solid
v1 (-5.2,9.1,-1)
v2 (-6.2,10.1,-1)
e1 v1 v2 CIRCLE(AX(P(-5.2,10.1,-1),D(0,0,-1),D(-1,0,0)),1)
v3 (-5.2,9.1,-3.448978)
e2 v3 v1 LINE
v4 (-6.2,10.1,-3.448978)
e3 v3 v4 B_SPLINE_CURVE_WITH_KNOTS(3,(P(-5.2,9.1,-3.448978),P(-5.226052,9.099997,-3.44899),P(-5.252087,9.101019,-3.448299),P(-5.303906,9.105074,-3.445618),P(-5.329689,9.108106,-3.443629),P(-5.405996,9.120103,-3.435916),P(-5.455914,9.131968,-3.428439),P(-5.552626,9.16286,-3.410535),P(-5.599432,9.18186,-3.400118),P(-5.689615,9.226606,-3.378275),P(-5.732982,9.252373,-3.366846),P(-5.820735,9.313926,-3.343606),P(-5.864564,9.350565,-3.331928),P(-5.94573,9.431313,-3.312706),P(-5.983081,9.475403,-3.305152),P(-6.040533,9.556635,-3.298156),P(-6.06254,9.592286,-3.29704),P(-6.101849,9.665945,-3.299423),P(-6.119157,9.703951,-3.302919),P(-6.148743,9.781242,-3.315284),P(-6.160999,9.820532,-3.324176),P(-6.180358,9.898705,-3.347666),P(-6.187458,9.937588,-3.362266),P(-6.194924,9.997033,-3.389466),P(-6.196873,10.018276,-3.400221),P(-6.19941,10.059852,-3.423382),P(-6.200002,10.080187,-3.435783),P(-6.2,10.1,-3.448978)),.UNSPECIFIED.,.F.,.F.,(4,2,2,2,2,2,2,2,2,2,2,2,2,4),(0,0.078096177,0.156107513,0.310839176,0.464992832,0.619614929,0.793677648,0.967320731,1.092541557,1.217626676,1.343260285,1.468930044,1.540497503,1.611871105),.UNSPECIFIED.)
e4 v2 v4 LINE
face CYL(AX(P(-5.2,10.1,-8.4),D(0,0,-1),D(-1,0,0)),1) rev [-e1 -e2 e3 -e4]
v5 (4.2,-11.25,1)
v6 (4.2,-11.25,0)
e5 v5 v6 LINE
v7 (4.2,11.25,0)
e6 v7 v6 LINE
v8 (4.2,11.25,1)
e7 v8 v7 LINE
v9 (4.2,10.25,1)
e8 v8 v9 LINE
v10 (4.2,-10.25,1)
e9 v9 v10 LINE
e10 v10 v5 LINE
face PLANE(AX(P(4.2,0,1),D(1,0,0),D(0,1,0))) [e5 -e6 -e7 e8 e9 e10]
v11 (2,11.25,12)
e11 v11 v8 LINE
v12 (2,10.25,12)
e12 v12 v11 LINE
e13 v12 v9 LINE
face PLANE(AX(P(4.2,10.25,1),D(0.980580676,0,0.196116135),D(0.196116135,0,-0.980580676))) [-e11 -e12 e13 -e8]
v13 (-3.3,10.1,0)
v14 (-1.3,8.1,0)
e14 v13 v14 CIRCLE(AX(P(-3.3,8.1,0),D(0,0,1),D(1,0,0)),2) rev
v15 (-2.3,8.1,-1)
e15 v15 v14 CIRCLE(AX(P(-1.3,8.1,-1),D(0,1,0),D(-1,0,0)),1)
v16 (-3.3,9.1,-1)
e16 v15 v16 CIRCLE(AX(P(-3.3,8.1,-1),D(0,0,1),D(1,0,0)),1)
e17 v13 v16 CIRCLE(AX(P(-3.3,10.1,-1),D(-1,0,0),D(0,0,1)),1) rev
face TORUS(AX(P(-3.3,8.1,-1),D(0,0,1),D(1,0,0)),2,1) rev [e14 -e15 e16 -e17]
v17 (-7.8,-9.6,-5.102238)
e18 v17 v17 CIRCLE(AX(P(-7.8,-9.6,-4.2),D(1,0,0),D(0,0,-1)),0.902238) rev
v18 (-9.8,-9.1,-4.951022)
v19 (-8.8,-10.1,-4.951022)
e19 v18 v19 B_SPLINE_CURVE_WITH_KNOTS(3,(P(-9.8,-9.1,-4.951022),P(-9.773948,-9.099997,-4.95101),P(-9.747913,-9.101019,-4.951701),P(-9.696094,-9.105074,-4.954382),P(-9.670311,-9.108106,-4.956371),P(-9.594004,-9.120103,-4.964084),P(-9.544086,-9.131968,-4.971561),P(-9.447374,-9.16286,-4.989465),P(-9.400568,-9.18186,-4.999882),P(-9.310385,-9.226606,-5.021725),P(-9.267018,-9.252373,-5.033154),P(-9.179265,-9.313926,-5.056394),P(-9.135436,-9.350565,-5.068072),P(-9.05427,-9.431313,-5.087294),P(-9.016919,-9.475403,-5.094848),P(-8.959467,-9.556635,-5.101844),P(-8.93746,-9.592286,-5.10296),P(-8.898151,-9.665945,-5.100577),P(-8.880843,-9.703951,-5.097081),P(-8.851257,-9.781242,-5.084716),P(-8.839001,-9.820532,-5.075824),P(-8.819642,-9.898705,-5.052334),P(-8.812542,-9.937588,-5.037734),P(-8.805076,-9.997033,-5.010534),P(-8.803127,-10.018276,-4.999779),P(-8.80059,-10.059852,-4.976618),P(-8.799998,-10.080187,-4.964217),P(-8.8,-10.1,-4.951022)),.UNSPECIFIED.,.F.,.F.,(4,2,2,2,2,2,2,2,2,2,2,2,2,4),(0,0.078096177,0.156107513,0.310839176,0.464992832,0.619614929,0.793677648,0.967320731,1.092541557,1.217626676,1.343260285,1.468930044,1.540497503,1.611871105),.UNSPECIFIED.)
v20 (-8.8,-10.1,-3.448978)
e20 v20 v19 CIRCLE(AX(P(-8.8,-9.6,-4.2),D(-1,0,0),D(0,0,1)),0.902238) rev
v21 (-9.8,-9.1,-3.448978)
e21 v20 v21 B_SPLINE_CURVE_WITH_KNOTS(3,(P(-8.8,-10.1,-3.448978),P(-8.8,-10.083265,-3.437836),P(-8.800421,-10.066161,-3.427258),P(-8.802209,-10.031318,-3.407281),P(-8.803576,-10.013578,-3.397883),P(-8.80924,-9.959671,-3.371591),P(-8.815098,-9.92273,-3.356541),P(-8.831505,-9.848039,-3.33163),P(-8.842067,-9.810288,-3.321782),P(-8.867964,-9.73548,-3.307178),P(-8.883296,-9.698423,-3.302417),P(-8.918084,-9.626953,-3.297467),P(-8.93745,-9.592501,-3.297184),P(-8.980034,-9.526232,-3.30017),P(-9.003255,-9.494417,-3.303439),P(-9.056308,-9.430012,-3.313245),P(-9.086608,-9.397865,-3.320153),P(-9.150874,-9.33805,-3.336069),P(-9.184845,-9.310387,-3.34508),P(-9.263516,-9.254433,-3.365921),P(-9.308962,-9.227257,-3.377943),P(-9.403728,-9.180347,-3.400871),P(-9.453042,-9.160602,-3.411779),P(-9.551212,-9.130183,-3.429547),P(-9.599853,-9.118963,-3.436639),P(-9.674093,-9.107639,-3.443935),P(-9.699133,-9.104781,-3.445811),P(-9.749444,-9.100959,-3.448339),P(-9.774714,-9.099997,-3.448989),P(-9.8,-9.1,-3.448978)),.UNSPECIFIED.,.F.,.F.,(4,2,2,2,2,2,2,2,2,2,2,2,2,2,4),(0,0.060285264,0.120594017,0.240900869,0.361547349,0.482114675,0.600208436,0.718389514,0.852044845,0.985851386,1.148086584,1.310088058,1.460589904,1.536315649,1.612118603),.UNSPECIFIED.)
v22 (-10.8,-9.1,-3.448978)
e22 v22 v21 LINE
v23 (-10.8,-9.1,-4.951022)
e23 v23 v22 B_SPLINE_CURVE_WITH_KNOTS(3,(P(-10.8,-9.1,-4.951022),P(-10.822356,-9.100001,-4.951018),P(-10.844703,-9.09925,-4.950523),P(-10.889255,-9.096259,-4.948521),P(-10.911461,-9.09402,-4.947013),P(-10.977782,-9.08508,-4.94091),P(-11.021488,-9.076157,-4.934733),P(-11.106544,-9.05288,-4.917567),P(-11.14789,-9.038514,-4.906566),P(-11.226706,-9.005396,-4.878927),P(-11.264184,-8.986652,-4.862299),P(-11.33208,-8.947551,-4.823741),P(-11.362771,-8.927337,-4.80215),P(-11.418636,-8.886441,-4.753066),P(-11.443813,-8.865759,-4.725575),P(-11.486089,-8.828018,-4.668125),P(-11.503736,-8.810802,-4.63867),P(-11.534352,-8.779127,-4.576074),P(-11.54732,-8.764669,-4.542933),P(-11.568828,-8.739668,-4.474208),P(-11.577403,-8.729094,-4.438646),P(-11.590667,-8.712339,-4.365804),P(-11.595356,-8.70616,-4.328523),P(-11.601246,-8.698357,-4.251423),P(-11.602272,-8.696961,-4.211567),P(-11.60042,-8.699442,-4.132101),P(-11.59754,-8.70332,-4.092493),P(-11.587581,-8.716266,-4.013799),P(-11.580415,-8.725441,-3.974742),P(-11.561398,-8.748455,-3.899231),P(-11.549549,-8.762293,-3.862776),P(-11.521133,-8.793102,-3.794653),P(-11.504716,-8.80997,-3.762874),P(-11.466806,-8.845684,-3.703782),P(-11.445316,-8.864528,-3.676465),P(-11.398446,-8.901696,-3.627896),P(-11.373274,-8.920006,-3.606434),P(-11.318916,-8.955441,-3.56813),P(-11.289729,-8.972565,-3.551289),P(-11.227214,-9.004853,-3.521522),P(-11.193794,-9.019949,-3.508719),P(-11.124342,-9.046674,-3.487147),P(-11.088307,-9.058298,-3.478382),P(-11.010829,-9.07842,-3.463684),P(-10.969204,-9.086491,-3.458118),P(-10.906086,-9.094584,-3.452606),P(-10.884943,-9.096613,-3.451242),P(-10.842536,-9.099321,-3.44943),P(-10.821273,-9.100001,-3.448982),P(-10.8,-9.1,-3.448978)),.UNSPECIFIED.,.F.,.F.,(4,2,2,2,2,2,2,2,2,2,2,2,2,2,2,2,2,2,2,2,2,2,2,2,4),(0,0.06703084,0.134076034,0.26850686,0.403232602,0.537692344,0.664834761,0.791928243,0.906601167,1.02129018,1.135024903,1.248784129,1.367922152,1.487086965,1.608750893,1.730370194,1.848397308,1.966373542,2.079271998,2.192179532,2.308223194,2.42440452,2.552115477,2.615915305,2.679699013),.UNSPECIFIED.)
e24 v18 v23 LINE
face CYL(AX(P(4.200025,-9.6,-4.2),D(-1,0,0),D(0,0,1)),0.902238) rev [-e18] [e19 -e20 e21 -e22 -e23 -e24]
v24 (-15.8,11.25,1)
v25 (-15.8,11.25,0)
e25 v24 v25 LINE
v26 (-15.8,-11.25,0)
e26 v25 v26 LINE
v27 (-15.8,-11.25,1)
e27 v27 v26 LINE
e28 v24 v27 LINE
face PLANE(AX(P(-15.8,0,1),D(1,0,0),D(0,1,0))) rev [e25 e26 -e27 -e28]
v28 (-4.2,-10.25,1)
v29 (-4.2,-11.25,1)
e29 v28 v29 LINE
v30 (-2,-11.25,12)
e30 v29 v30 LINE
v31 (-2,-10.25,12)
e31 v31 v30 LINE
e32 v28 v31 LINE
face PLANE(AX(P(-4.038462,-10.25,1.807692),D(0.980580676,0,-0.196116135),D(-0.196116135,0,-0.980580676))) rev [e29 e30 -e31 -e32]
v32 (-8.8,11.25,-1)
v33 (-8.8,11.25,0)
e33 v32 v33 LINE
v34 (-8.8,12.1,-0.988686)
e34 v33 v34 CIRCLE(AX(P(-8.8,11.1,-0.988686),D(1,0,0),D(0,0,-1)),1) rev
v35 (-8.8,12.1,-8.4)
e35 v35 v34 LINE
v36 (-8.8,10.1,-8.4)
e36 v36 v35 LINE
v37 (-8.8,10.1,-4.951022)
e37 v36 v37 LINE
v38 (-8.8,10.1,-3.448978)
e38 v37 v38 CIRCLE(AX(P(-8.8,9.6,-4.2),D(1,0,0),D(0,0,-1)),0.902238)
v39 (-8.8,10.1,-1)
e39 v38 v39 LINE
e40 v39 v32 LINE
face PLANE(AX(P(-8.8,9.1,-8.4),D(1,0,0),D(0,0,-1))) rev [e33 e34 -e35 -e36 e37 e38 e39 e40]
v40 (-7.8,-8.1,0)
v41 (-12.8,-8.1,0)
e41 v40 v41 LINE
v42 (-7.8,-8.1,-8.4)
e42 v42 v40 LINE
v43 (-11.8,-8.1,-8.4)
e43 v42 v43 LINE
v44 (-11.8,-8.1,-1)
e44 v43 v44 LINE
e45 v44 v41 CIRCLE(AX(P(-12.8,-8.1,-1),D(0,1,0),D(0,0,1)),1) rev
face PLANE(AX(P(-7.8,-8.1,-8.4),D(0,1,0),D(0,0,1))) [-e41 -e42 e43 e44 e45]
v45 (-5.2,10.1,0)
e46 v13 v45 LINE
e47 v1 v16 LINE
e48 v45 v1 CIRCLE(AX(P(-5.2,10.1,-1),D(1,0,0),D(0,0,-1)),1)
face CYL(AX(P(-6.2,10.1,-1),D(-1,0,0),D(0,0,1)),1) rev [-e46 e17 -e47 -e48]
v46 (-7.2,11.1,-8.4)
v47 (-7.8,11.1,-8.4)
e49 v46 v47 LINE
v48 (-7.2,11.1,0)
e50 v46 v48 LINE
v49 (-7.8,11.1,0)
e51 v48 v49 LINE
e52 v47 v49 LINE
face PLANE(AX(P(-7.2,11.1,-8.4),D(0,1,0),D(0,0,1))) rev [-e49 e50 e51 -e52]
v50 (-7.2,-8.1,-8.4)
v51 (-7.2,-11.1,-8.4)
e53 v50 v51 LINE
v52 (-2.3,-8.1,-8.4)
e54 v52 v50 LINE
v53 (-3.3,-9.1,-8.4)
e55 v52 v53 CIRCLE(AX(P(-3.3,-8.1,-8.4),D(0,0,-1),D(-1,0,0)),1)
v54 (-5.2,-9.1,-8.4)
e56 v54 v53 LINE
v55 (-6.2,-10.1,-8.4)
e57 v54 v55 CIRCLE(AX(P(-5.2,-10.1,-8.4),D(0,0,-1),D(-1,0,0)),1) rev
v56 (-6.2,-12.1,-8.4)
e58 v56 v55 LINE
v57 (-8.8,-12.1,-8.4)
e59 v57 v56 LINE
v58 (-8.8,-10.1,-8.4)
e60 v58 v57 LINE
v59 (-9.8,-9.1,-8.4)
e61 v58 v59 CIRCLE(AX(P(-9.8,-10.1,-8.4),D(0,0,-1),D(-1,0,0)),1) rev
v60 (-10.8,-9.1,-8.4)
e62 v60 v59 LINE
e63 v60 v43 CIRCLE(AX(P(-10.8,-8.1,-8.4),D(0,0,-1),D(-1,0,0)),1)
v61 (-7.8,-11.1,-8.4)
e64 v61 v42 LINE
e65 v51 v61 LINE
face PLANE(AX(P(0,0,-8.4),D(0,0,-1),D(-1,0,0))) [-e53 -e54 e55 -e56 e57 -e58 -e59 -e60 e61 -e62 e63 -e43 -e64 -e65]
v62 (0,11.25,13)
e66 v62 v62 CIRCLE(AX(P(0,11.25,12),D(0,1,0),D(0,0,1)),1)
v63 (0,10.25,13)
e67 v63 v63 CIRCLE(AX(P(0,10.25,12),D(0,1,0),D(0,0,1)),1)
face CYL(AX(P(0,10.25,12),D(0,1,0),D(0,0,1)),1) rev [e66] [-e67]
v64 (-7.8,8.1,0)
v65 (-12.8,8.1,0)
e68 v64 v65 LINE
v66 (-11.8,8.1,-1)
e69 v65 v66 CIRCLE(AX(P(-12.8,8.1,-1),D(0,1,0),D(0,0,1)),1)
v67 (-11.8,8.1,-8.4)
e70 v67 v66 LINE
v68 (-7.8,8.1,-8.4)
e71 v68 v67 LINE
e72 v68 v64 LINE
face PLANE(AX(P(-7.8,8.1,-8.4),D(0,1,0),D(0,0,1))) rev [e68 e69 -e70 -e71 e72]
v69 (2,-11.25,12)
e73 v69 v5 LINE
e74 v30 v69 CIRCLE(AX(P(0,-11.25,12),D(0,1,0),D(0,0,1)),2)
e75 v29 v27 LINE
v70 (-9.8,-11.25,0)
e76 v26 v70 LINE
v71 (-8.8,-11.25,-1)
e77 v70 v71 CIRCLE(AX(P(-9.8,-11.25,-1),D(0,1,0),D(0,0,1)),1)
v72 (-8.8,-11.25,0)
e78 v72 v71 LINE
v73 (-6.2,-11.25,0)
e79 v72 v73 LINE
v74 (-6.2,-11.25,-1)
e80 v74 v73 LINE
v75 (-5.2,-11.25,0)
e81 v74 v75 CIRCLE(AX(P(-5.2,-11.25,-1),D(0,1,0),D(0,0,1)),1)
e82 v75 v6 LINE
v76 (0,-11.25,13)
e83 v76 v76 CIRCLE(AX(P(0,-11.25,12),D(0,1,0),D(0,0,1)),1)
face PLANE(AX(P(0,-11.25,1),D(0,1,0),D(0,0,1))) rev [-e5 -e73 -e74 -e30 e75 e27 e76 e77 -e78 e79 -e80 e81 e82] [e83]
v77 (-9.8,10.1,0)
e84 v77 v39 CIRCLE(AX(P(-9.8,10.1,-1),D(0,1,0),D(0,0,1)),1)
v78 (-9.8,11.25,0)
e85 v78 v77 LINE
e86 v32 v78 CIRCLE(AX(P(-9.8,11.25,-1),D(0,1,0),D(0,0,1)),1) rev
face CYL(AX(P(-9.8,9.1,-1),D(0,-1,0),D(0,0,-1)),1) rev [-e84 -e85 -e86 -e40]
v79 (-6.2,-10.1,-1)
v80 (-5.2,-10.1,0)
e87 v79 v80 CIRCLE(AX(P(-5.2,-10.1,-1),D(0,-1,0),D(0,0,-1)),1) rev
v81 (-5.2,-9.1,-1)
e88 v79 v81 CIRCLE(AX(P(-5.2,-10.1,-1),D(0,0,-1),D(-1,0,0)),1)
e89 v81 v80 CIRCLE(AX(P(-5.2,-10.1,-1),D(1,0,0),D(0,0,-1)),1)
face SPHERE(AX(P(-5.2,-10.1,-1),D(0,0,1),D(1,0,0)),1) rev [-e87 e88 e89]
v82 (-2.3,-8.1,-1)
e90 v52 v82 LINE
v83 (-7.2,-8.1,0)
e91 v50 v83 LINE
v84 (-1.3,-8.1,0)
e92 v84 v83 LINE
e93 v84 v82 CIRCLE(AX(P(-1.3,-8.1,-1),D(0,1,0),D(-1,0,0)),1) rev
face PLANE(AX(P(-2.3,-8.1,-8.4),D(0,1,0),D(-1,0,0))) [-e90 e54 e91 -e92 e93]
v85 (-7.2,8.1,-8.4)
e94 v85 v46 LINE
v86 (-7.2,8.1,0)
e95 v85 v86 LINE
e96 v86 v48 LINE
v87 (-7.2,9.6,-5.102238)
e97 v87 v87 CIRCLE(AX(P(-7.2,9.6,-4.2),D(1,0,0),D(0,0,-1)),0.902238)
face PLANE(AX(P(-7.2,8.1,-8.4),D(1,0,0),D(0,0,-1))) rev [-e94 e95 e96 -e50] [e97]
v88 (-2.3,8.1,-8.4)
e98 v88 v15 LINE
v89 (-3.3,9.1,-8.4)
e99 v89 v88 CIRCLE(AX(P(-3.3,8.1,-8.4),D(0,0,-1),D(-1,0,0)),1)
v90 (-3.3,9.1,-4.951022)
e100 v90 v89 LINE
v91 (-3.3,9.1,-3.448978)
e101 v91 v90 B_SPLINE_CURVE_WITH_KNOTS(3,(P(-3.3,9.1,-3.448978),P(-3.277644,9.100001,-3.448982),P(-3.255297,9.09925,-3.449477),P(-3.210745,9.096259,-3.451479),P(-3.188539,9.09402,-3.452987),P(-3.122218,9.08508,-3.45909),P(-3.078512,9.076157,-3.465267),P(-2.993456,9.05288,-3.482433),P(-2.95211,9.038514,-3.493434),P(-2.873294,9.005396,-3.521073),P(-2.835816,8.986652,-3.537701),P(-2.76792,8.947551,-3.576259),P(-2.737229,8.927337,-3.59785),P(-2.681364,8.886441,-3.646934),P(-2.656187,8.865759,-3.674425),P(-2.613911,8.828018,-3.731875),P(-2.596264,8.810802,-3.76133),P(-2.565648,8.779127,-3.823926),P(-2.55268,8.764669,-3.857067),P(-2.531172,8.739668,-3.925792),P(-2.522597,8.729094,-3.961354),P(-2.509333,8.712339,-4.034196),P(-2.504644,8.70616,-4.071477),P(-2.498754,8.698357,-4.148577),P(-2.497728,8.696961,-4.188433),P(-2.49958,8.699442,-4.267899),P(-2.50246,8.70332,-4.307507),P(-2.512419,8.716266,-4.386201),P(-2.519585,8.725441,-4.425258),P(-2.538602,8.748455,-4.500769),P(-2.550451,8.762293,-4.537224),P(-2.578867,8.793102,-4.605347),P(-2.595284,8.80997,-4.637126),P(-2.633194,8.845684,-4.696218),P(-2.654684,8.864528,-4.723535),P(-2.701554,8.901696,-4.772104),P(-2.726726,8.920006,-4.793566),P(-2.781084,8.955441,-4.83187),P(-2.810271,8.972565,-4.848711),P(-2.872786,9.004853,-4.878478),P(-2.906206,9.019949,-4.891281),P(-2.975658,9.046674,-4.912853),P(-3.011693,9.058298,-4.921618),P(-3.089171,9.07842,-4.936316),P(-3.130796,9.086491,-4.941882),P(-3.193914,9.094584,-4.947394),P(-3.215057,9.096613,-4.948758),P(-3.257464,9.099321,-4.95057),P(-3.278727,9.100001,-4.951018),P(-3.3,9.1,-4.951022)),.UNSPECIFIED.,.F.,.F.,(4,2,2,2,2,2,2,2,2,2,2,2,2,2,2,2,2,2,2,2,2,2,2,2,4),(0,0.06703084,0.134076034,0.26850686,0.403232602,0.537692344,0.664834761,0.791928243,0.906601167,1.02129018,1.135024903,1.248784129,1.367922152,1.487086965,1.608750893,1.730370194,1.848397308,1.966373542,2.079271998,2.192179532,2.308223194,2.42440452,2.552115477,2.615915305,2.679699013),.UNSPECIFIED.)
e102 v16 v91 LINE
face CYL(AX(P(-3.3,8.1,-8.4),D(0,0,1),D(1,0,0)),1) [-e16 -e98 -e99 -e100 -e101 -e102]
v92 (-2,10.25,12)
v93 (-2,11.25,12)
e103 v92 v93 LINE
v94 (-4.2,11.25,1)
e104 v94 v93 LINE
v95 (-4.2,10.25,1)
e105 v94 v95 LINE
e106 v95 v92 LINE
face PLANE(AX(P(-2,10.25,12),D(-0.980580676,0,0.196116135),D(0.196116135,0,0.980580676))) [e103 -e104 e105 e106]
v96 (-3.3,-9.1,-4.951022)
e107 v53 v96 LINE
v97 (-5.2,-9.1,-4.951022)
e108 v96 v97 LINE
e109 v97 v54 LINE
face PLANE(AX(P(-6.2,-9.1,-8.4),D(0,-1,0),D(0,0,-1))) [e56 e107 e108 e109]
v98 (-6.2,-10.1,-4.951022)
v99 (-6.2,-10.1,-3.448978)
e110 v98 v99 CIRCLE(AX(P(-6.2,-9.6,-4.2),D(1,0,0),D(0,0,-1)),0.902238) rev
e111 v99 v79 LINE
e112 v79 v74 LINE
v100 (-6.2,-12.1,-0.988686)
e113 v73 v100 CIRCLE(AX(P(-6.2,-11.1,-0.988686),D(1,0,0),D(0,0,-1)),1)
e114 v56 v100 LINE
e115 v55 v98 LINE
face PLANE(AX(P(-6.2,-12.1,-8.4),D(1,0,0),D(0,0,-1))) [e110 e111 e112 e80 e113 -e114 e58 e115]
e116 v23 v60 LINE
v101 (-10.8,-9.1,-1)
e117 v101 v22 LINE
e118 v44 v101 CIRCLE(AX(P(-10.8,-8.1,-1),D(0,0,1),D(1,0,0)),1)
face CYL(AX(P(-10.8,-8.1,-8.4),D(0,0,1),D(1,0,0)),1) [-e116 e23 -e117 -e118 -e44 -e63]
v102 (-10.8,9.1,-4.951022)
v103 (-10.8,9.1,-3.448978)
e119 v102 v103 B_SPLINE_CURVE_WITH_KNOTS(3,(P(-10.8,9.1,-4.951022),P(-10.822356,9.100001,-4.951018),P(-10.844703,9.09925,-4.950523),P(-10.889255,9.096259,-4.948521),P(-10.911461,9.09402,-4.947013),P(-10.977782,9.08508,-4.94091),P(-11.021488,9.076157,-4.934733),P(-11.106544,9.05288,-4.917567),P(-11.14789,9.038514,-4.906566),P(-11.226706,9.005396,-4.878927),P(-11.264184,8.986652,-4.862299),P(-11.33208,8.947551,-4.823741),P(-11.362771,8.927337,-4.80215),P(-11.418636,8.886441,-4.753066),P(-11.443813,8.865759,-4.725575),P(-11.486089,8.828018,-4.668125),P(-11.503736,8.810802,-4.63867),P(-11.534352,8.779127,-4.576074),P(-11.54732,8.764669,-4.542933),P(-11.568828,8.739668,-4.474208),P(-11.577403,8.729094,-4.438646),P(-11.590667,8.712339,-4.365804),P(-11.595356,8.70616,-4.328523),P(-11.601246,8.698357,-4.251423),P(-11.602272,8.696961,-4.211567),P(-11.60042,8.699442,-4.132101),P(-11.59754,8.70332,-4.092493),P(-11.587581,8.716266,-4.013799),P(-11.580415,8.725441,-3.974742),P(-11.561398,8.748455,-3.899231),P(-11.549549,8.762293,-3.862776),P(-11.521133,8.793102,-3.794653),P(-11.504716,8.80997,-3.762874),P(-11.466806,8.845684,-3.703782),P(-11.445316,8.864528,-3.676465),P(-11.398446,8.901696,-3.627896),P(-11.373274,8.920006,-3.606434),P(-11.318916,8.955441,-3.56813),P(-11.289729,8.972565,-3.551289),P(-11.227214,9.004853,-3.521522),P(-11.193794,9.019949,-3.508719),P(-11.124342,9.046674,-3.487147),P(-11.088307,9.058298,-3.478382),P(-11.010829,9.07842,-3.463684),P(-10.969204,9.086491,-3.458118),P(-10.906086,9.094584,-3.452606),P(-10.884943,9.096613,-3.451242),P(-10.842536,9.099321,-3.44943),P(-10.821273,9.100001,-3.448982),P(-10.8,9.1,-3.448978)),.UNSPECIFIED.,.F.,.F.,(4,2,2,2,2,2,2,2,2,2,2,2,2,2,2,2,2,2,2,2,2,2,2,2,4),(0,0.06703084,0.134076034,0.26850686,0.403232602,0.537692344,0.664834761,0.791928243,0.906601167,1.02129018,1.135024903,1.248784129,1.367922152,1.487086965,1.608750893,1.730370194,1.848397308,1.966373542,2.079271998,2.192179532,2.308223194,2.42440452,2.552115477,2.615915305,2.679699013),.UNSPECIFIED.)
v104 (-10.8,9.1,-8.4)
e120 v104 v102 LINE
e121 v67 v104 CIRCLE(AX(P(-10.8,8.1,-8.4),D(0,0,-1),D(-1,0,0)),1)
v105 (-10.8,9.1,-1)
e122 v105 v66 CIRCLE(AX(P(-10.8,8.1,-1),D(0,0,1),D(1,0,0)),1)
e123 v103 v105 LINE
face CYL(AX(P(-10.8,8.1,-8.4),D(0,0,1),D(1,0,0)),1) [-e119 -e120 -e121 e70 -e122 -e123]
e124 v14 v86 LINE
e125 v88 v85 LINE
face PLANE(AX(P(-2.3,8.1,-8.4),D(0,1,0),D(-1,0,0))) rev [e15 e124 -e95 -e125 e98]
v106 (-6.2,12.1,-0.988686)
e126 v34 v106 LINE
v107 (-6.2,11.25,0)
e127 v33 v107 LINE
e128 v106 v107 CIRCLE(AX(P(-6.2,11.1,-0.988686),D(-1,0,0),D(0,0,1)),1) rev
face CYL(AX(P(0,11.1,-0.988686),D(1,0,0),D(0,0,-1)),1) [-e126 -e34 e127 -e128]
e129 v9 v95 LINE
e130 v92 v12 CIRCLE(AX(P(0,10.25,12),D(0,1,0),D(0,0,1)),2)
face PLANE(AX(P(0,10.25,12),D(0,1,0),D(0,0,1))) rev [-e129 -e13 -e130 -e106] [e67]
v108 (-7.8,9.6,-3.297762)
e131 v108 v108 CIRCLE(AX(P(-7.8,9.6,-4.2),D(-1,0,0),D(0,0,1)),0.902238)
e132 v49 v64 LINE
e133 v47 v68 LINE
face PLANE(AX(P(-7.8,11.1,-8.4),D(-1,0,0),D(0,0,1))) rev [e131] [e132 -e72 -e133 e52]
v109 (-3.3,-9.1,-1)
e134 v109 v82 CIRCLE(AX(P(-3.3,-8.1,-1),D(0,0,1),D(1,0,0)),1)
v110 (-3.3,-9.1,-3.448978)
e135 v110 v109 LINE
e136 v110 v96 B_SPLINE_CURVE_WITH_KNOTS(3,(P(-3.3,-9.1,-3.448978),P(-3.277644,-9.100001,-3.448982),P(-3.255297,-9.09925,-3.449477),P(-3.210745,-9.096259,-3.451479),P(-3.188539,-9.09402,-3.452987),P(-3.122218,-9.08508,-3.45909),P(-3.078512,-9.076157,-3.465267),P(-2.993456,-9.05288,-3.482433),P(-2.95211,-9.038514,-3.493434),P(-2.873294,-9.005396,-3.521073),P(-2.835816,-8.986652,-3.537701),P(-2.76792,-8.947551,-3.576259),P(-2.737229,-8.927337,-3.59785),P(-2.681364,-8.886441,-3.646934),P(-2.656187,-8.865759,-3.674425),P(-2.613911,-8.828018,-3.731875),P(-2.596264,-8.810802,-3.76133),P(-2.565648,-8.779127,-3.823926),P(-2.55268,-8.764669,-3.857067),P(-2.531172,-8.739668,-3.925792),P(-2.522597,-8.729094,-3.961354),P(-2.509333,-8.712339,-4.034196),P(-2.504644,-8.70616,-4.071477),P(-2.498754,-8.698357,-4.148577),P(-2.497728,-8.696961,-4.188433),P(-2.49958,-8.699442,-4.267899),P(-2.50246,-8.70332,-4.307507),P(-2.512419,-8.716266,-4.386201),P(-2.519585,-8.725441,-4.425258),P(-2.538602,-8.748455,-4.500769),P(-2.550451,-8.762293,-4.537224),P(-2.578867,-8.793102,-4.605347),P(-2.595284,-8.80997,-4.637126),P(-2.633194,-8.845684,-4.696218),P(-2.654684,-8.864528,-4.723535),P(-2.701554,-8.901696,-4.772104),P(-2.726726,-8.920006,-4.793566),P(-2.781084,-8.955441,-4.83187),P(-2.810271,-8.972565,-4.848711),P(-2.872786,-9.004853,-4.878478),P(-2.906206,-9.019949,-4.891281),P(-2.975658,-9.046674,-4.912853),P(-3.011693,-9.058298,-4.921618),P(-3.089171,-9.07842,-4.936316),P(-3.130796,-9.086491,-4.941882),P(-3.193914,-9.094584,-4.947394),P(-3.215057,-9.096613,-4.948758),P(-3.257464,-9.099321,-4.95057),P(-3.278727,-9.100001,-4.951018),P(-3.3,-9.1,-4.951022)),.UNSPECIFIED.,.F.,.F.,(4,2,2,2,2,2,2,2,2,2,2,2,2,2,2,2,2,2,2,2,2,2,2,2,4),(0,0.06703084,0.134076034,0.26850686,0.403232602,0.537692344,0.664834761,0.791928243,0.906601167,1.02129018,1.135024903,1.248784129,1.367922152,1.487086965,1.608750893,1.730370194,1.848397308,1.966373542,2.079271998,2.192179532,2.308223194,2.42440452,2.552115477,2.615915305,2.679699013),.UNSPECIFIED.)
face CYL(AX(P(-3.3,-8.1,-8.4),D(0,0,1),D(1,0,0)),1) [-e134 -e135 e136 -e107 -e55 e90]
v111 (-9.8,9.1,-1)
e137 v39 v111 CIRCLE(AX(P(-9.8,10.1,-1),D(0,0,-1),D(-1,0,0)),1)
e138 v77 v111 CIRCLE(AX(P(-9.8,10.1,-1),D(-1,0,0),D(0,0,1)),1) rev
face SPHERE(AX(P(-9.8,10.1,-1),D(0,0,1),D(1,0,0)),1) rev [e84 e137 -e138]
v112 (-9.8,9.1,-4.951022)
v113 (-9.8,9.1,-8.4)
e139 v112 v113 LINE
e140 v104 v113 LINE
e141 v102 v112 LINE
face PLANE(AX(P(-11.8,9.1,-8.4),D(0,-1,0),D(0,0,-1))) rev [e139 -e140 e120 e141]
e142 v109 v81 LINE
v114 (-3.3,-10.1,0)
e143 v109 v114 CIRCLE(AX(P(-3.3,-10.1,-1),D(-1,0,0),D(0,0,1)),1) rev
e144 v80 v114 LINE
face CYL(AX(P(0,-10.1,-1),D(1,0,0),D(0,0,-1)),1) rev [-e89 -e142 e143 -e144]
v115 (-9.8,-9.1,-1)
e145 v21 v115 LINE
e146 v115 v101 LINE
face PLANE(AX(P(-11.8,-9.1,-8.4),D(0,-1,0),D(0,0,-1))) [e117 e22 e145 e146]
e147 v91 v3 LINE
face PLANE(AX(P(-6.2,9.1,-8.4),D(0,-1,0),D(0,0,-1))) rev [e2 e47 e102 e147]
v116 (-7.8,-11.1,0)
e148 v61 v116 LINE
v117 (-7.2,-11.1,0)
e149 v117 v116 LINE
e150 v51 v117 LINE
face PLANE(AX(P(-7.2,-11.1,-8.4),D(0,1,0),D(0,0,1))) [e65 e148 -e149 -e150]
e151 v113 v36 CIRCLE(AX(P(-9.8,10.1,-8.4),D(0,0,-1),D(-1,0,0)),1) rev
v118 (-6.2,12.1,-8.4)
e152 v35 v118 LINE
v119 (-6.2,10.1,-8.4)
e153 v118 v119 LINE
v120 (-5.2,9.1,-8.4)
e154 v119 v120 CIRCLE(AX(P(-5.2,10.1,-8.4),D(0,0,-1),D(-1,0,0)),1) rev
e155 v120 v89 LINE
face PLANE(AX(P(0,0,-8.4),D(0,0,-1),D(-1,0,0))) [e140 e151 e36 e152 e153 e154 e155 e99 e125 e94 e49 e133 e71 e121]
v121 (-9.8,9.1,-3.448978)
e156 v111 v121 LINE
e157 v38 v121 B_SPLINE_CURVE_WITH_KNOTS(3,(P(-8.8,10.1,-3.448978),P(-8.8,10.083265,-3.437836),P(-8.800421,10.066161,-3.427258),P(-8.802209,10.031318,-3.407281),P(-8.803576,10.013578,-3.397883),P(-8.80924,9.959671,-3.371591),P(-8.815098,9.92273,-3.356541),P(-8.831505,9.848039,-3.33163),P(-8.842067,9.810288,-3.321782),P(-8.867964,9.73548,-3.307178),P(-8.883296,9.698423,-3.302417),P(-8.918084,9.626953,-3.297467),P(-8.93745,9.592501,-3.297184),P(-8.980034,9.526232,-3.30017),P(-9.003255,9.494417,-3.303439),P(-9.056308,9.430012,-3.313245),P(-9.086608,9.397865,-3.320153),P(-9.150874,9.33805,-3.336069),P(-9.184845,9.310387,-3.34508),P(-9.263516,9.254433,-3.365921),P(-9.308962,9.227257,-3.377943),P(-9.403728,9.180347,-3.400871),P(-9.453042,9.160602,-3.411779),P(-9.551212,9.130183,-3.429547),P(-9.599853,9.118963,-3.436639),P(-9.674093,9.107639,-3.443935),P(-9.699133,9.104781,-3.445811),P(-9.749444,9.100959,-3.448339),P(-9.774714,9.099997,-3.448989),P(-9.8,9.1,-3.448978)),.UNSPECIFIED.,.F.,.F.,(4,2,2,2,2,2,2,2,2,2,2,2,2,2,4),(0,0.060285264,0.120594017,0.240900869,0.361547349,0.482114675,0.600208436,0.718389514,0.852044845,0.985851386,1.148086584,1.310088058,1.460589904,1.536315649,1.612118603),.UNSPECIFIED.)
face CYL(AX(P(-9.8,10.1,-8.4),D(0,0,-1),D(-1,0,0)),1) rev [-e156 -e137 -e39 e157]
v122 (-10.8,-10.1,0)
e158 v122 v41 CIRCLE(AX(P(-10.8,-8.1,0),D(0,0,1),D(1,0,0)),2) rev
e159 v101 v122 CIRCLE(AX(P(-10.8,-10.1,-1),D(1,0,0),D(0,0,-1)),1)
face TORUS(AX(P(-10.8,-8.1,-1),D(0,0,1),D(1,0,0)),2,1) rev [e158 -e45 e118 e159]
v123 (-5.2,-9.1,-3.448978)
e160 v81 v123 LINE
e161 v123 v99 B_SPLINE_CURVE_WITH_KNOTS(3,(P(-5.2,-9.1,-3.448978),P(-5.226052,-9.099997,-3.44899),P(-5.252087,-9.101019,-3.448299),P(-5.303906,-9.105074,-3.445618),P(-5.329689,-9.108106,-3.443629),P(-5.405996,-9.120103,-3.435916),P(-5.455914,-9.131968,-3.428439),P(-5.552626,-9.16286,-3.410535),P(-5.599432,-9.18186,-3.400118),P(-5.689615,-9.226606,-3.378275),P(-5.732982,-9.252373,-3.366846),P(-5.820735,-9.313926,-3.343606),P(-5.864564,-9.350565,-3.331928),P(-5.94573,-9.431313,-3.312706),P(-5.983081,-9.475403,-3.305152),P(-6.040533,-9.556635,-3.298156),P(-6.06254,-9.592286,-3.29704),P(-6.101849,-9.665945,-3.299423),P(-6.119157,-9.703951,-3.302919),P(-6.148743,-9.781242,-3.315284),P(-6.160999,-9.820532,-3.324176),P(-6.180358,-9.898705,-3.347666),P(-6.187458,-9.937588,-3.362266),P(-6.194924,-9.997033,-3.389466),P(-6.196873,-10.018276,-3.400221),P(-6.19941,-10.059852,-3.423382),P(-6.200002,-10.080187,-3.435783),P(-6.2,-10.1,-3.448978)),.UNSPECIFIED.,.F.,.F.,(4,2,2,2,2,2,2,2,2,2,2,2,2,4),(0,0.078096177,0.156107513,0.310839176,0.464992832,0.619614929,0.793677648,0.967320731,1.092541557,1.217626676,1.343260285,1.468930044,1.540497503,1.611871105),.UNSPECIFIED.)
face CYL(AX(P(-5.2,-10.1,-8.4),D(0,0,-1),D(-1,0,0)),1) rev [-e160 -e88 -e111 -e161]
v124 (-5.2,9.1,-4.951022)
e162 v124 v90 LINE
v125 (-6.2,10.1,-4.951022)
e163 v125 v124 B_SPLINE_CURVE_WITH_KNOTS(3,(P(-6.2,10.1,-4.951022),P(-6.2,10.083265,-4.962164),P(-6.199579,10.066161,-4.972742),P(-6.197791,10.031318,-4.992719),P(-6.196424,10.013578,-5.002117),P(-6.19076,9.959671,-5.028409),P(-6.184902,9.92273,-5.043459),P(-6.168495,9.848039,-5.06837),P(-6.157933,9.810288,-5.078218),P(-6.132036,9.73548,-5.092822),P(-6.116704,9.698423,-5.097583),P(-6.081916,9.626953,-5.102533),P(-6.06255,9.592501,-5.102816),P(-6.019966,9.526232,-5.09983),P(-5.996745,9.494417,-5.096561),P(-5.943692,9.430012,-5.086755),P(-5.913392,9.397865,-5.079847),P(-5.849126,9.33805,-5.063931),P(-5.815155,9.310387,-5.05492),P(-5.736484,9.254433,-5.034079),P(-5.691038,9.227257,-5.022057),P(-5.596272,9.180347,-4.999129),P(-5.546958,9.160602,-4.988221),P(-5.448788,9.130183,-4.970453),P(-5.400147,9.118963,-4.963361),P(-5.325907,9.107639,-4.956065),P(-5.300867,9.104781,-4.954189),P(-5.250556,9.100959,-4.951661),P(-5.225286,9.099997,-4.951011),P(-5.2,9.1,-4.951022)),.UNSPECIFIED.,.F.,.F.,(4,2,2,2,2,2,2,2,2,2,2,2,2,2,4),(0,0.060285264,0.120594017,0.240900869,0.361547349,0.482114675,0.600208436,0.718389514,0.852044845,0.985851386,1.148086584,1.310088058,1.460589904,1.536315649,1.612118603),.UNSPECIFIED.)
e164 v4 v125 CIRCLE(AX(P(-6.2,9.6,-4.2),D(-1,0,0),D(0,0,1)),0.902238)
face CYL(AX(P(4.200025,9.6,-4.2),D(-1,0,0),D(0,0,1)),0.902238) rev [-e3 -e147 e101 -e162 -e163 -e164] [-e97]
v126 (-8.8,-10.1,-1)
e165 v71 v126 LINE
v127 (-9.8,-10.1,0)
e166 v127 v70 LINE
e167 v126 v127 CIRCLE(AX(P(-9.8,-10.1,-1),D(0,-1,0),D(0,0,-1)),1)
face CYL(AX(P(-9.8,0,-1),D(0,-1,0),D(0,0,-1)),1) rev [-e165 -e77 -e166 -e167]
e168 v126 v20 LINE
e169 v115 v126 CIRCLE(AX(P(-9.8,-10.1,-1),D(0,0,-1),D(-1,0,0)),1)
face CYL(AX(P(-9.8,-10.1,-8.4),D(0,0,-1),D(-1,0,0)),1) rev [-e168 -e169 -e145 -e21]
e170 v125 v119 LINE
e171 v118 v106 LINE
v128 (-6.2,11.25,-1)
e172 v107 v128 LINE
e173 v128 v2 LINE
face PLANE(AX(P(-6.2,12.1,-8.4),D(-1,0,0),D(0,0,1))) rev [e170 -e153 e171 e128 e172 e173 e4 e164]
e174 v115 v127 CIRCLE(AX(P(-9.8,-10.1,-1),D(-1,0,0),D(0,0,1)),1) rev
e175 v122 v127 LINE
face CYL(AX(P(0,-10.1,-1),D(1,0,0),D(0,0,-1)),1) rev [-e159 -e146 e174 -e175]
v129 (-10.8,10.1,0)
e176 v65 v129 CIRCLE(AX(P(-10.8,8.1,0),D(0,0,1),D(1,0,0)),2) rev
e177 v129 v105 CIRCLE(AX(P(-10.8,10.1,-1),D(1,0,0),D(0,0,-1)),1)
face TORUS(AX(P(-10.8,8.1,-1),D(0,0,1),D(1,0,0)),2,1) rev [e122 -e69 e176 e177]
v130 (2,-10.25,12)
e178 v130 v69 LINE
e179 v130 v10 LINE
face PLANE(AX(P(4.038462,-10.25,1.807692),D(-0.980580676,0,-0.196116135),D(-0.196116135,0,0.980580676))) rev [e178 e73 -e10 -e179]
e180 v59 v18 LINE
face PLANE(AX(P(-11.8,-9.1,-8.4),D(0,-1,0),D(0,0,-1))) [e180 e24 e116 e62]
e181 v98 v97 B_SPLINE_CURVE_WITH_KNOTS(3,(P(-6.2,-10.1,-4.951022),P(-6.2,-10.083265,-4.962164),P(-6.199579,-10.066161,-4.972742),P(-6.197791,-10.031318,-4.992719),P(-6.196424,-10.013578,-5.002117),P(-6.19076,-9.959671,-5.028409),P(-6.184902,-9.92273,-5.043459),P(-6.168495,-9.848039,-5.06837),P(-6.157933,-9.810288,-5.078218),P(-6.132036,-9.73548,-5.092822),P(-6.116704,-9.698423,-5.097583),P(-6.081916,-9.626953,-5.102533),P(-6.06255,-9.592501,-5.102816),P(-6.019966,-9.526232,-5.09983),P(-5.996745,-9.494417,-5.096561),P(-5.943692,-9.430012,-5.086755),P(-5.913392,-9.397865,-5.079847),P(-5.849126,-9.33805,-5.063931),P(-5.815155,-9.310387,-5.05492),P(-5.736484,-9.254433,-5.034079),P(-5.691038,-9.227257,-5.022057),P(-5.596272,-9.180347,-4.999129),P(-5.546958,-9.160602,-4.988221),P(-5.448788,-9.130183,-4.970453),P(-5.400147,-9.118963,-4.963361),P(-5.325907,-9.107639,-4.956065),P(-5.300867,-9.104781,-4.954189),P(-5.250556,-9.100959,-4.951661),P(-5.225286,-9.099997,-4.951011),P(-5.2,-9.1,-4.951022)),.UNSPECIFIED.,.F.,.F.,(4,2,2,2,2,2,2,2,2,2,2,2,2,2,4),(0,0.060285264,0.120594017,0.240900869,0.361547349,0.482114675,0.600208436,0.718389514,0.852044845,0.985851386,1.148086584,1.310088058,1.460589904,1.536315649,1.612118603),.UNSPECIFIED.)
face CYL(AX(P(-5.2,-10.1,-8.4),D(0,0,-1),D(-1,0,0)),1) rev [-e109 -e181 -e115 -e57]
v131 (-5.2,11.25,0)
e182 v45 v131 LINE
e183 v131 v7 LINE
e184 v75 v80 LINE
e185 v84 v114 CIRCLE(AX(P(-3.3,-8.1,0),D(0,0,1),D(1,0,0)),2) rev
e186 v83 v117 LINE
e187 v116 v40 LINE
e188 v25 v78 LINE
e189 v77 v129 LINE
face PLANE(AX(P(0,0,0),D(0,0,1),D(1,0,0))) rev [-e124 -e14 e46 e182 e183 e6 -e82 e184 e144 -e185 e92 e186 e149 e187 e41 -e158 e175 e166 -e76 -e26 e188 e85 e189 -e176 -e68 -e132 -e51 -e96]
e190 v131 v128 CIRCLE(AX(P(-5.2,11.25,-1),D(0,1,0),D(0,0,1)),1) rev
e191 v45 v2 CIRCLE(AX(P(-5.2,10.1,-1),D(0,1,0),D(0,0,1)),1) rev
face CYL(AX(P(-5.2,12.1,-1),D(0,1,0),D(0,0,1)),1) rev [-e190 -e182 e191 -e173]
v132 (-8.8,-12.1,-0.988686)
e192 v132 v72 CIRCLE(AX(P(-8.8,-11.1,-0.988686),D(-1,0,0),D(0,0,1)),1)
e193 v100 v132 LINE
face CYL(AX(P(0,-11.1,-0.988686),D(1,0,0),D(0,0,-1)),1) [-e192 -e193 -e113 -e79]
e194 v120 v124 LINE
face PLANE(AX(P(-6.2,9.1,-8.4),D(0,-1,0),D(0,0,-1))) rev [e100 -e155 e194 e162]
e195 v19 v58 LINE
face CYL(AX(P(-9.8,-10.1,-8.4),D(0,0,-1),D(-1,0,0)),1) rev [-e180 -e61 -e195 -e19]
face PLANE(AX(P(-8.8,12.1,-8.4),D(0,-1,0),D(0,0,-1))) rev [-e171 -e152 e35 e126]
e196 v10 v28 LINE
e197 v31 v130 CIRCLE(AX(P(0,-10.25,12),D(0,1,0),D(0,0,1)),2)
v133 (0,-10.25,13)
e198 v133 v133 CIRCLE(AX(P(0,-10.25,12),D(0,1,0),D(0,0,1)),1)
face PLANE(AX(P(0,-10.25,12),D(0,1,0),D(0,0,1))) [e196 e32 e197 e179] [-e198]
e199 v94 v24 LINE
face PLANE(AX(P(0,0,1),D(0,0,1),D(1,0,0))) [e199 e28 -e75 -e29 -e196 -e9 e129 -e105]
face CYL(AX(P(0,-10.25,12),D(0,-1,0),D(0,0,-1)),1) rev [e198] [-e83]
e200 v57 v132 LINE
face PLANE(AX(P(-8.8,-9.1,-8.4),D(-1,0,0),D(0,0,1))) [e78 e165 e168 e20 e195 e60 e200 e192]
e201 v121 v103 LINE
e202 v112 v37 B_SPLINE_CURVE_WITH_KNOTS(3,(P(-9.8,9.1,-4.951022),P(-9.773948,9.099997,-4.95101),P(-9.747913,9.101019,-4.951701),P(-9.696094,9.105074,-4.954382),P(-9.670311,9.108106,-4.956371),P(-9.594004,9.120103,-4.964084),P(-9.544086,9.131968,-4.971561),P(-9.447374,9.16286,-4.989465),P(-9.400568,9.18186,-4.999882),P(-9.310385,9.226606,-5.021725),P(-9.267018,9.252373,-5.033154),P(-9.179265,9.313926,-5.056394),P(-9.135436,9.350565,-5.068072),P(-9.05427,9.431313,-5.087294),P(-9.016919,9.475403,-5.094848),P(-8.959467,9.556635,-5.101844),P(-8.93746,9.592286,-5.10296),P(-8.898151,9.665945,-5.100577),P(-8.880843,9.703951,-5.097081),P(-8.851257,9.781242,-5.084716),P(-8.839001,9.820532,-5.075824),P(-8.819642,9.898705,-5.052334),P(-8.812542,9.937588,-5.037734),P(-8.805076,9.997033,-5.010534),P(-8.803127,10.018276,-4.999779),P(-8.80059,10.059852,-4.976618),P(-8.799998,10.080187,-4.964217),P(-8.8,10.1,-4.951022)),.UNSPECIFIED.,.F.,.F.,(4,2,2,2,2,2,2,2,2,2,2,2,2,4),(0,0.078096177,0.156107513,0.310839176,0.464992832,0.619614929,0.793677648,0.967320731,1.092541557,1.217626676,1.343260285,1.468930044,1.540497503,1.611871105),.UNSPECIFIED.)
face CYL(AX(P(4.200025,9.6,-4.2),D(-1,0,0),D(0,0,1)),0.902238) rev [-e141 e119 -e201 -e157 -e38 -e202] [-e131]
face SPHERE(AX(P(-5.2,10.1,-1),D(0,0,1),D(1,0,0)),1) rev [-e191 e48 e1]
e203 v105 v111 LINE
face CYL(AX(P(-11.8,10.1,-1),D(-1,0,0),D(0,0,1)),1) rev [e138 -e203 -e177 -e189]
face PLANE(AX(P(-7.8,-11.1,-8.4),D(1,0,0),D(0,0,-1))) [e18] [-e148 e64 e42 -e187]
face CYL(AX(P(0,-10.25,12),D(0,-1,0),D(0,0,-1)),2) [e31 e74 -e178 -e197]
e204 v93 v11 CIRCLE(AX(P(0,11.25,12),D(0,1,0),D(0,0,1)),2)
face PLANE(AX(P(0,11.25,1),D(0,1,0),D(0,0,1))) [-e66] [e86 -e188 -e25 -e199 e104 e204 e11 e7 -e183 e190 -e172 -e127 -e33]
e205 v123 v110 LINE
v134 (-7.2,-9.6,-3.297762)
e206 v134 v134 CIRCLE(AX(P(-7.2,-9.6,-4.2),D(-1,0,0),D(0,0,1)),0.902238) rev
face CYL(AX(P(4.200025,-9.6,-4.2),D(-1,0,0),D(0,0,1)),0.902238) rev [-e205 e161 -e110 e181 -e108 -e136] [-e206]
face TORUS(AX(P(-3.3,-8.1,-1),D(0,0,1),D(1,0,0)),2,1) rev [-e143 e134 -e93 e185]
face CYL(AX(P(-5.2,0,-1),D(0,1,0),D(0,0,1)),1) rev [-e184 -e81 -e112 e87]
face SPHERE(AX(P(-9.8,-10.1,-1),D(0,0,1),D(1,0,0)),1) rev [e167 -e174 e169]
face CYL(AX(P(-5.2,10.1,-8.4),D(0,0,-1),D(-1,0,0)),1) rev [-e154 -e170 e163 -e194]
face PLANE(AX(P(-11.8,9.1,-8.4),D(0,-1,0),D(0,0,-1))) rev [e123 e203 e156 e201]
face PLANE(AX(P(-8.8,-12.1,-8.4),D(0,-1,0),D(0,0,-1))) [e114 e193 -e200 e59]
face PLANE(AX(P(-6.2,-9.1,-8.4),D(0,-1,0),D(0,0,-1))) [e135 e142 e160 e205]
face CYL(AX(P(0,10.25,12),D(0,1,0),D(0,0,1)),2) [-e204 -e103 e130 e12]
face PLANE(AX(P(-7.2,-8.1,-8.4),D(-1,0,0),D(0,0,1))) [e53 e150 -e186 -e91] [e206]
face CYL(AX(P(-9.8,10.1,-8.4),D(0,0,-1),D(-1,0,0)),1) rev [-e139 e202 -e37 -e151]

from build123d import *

# Parameters (mm, degrees)
SKETCH1_W           = 8.4
SKETCH1_H           = 22.5
BOSS_EXTRUDE1_DEPTH = 1
SKETCH2_R           = 1
BOSS_EXTRUDE2_DEPTH = 1
BOSS_EXTRUDE3_START = -21.5
SKETCH2_2_R         = 1
BOSS_EXTRUDE3_DEPTH = 1
SKETCH1_3_W         = 11.6
SKETCH1_3_H         = 22.5
BOSS_EXTRUDE4_DEPTH = 1
BOSS_EXTRUDE5_DEPTH = 8.4
FILLET2_R           = 1
SKETCH4_R           = 0.902238409
CUT_EXTRUDE1_DEPTH  = 23.614375959


with BuildPart() as part:
    # Sketch1 → Boss-Extrude1 (new body)
    with BuildSketch(Plane.XY):
        Rectangle(SKETCH1_W, SKETCH1_H)
    extrude(amount=BOSS_EXTRUDE1_DEPTH)

    # Sketch2 → Boss-Extrude2 (add)
    with BuildSketch(Plane(origin=(0, 11.25, 0), x_dir=(1, 0, 0), z_dir=(0, 1, 0))):
        with BuildLine():
            Line((-2, -12), (-4.2, -1))
            Line((-4.2, -1), (4.2, -1))
            Line((4.2, -1), (2, -12))
            ThreePointArc((2, -12), (0, -14), (-2, -12))
        make_face()
        with Locations(Location((0, -12, 0), (0, 0, 270))):
            Circle(SKETCH2_R, mode=Mode.SUBTRACT)
    extrude(amount=-BOSS_EXTRUDE2_DEPTH)

    # Sketch2<2> → Boss-Extrude3 (add)
    with BuildSketch(Plane(origin=(0, 11.25, 0), x_dir=(1, 0, 0), z_dir=(0, 1, 0)).offset(BOSS_EXTRUDE3_START)):
        with BuildLine():
            Line((-2, -12), (-4.2, -1))
            Line((-4.2, -1), (4.2, -1))
            Line((4.2, -1), (2, -12))
            ThreePointArc((2, -12), (0, -14), (-2, -12))
        make_face()
        with Locations(Location((0, -12, 0), (0, 0, 270))):
            Circle(SKETCH2_2_R, mode=Mode.SUBTRACT)
    extrude(amount=-BOSS_EXTRUDE3_DEPTH)

    # Sketch1<3> → Boss-Extrude4 (add)
    with BuildSketch(Plane.XY):
        with Locations((-10, 0)):
            Rectangle(SKETCH1_3_W, SKETCH1_3_H)
    extrude(amount=BOSS_EXTRUDE4_DEPTH)

    # Sketch3 → Boss-Extrude5 (add)
    with BuildSketch(Plane(origin=(0, 0, 0), x_dir=(-1, 0, 0), z_dir=(0, 0, -1))):
        Polygon((2.3, 8.1), (7.2, 8.1), (7.2, 11.1), (7.8, 11.1), (7.8, 8.1), (11.8, 8.1), (11.8, 9.1), (8.8, 9.1), (8.8, 12.1), (6.2, 12.1), (6.2, 9.1), (2.3, 9.1), align=None)
    extrude(amount=BOSS_EXTRUDE5_DEPTH)

    # Fillet2
    # the kernel refuses this fillet: 1 mm, written as the material it adds along each edge
    with BuildSketch(Plane(origin=(-6.2, 11.25, 0), x_dir=(1, 0, 0), z_dir=(0, -1, 0))) as fillet2_piece_1_section:
        with BuildLine():
            CenterArc((FILLET2_R, -FILLET2_R), FILLET2_R, 90, 90)
            Line((0, -FILLET2_R), (0, 0))
            Line((0, 0), (FILLET2_R, 0))
        make_face()
    fillet2_piece_1 = extrude(amount=4.65, mode=Mode.PRIVATE)
    fillet2_piece_1 = split(fillet2_piece_1, bisect_by=Plane(origin=(-6.2, 8.1, 0), z_dir=(0, 1, 0)), keep=Keep.TOP, mode=Mode.PRIVATE)
    add(fillet2_piece_1)
    with BuildSketch(Plane(origin=(-8.8, 9.1, 0), x_dir=(-1, 0, 0), z_dir=(0, 1, 0))) as fillet2_piece_2:
        with BuildLine():
            CenterArc((FILLET2_R, -FILLET2_R), FILLET2_R, 90, 90)
            Line((0, -FILLET2_R), (0, 0))
            Line((0, 0), (FILLET2_R, 0))
        make_face()
    extrude(amount=2.15)
    with BuildSketch(Plane(origin=(-8.8, 9.1, 2.5), x_dir=(-1, 0, 0), z_dir=(0, 0, -1))) as fillet2_piece_3_section:
        with BuildLine():
            CenterArc((FILLET2_R, FILLET2_R), FILLET2_R, 180, 90)
            Line((0, FILLET2_R), (0, 0))
            Line((0, 0), (FILLET2_R, 0))
        make_face()
    fillet2_piece_3 = extrude(amount=10.9, mode=Mode.PRIVATE)
    fillet2_piece_3 = split(fillet2_piece_3, bisect_by=Plane(origin=(-8.8, 9.1, 1), z_dir=(0, 0, -1)), keep=Keep.TOP, mode=Mode.PRIVATE)
    add(fillet2_piece_3)
    with BuildSketch(Plane(origin=(-6.2, 9.1, 2.5), x_dir=(0, 1, 0), z_dir=(0, 0, -1))) as fillet2_piece_4_section:
        with BuildLine():
            CenterArc((FILLET2_R, FILLET2_R), FILLET2_R, 180, 90)
            Line((0, FILLET2_R), (0, 0))
            Line((0, 0), (FILLET2_R, 0))
        make_face()
    fillet2_piece_4 = extrude(amount=10.9, mode=Mode.PRIVATE)
    fillet2_piece_4 = split(fillet2_piece_4, bisect_by=Plane(origin=(-6.2, 9.1, 1), z_dir=(0, 0, -1)), keep=Keep.TOP, mode=Mode.PRIVATE)
    add(fillet2_piece_4)
    # the kernel refuses this fillet: 1 mm, written as the material it takes off along each edge
    with BuildSketch(Plane(origin=(-2.3, 9.1, 0), x_dir=(-1, 0, 0), z_dir=(0, 0, -1)), Plane(origin=(-11.8, 9.1, 0), x_dir=(0, -1, 0), z_dir=(0, 0, -1))) as fillet2_2_piece_1:
        with BuildLine():
            CenterArc((FILLET2_R, -FILLET2_R), FILLET2_R, 90, 90)
            Line((0, -FILLET2_R), (0, 0))
            Line((0, 0), (FILLET2_R, 0))
        make_face()
    extrude(amount=10.9, mode=Mode.SUBTRACT)
    with BuildSketch(Plane(origin=(-11.271714992, 12.1, 0), x_dir=(0, 0, -1), z_dir=(1, 0, 0))) as fillet2_2_piece_2:
        with BuildLine():
            CenterArc((0.988685997, -1), FILLET2_R, 90, 81.373073441)
            Line((0, -0.85), (0, 0))
            Line((0, 0), (0.988685997, 0))
        make_face()
    extrude(amount=7.543429983, mode=Mode.SUBTRACT)
    # the kernel refuses this fillet: 1 mm, written as the material it adds along each edge
    with BuildSketch(Plane(origin=(-5.2, 10.1, -1), x_dir=(0, -1, 0), z_dir=(0, 0, 1))) as fillet2_3_piece_1_section:
        Polygon((0, 0), (FILLET2_R * 1.02, 0), (FILLET2_R * 1.02, -FILLET2_R * 1.02), (0, -FILLET2_R * 1.02), align=None)
    fillet2_3_piece_1 = extrude(amount=FILLET2_R * 1.02, mode=Mode.PRIVATE)
    fillet2_3_piece_1 = fillet2_3_piece_1 - Plane(origin=(-5.2, 10.1, -1), x_dir=(0.7071067811865475, 0.7071067811865475, 0), z_dir=(0, 0, 1)) * Sphere(FILLET2_R, mode=Mode.PRIVATE)
    add(fillet2_3_piece_1)
    with BuildSketch(Plane(origin=(-9.8, 10.1, -1), x_dir=(0, -1, 0), z_dir=(0, 0, 1))) as fillet2_3_piece_2_section:
        Polygon((0, 0), (FILLET2_R * 1.02, 0), (FILLET2_R * 1.02, FILLET2_R * 1.02), (0, FILLET2_R * 1.02), align=None)
    fillet2_3_piece_2 = extrude(amount=FILLET2_R * 1.02, mode=Mode.PRIVATE)
    fillet2_3_piece_2 = fillet2_3_piece_2 - Plane(origin=(-9.8, 10.1, -1), x_dir=(-0.7071067811865475, 0.7071067811865475, 0), z_dir=(0, 0, 1)) * Sphere(FILLET2_R, mode=Mode.PRIVATE)
    add(fillet2_3_piece_2)
    with BuildSketch(Plane(origin=(-10.8, 9.1, 0), x_dir=(0, 1, 0), z_dir=(1, 0, 0))) as fillet2_3_piece_3:
        with BuildLine():
            CenterArc((FILLET2_R, -FILLET2_R), FILLET2_R, 90, 90)
            Line((0, -FILLET2_R), (0, 0))
            Line((0, 0), (FILLET2_R, 0))
        make_face()
    extrude(amount=1)
    with BuildSketch(Plane(origin=(-5.2, 9.1, 0), x_dir=(0, 1, 0), z_dir=(1, 0, 0))) as fillet2_3_piece_4:
        with BuildLine():
            CenterArc((FILLET2_R, -FILLET2_R), FILLET2_R, 90, 90)
            Line((0, -FILLET2_R), (0, 0))
            Line((0, 0), (FILLET2_R, 0))
        make_face()
    extrude(amount=1.9)
    with BuildSketch(Plane(origin=(-3.3, 8.1, 0), x_dir=(0, 1, 0), z_dir=(-1, 0, 0))) as fillet2_3_piece_5:
        with BuildLine():
            CenterArc((1 + FILLET2_R, FILLET2_R), FILLET2_R, 180, 90)
            Line((1, FILLET2_R), (1, 0))
            Line((1, 0), (1 + FILLET2_R, 0))
        make_face()
    revolve(axis=Axis((-3.3, 8.1, 0), (0, 0, -1)), revolution_arc=90)
    with BuildSketch(Plane(origin=(-10.8, 8.1, 0), x_dir=(-1, 0, 0), z_dir=(0, -1, 0))) as fillet2_3_piece_6:
        with BuildLine():
            CenterArc((1 + FILLET2_R, FILLET2_R), FILLET2_R, 180, 90)
            Line((1, FILLET2_R), (1, 0))
            Line((1, 0), (1 + FILLET2_R, 0))
        make_face()
    revolve(axis=Axis((-10.8, 8.1, 0), (0, 0, -1)), revolution_arc=90)

    # Sketch4 → Cut-Extrude1 (cut, symmetric)
    with BuildSketch(Plane.ZY.offset(8.8)):
        with Locations(Location((-4.2, 9.6, 0), (0, 0, 33.654064464))):
            Circle(SKETCH4_R)
    extrude(amount=CUT_EXTRUDE1_DEPTH, both=True, mode=Mode.SUBTRACT)

    # Mirror1: read off the stored shape, not the designer's step
    # Mirror1: part across plane


with BuildPart() as part_1:
    add(part.part)
    add(part.part.mirror(Plane.ZX))


solid = part_1.part
